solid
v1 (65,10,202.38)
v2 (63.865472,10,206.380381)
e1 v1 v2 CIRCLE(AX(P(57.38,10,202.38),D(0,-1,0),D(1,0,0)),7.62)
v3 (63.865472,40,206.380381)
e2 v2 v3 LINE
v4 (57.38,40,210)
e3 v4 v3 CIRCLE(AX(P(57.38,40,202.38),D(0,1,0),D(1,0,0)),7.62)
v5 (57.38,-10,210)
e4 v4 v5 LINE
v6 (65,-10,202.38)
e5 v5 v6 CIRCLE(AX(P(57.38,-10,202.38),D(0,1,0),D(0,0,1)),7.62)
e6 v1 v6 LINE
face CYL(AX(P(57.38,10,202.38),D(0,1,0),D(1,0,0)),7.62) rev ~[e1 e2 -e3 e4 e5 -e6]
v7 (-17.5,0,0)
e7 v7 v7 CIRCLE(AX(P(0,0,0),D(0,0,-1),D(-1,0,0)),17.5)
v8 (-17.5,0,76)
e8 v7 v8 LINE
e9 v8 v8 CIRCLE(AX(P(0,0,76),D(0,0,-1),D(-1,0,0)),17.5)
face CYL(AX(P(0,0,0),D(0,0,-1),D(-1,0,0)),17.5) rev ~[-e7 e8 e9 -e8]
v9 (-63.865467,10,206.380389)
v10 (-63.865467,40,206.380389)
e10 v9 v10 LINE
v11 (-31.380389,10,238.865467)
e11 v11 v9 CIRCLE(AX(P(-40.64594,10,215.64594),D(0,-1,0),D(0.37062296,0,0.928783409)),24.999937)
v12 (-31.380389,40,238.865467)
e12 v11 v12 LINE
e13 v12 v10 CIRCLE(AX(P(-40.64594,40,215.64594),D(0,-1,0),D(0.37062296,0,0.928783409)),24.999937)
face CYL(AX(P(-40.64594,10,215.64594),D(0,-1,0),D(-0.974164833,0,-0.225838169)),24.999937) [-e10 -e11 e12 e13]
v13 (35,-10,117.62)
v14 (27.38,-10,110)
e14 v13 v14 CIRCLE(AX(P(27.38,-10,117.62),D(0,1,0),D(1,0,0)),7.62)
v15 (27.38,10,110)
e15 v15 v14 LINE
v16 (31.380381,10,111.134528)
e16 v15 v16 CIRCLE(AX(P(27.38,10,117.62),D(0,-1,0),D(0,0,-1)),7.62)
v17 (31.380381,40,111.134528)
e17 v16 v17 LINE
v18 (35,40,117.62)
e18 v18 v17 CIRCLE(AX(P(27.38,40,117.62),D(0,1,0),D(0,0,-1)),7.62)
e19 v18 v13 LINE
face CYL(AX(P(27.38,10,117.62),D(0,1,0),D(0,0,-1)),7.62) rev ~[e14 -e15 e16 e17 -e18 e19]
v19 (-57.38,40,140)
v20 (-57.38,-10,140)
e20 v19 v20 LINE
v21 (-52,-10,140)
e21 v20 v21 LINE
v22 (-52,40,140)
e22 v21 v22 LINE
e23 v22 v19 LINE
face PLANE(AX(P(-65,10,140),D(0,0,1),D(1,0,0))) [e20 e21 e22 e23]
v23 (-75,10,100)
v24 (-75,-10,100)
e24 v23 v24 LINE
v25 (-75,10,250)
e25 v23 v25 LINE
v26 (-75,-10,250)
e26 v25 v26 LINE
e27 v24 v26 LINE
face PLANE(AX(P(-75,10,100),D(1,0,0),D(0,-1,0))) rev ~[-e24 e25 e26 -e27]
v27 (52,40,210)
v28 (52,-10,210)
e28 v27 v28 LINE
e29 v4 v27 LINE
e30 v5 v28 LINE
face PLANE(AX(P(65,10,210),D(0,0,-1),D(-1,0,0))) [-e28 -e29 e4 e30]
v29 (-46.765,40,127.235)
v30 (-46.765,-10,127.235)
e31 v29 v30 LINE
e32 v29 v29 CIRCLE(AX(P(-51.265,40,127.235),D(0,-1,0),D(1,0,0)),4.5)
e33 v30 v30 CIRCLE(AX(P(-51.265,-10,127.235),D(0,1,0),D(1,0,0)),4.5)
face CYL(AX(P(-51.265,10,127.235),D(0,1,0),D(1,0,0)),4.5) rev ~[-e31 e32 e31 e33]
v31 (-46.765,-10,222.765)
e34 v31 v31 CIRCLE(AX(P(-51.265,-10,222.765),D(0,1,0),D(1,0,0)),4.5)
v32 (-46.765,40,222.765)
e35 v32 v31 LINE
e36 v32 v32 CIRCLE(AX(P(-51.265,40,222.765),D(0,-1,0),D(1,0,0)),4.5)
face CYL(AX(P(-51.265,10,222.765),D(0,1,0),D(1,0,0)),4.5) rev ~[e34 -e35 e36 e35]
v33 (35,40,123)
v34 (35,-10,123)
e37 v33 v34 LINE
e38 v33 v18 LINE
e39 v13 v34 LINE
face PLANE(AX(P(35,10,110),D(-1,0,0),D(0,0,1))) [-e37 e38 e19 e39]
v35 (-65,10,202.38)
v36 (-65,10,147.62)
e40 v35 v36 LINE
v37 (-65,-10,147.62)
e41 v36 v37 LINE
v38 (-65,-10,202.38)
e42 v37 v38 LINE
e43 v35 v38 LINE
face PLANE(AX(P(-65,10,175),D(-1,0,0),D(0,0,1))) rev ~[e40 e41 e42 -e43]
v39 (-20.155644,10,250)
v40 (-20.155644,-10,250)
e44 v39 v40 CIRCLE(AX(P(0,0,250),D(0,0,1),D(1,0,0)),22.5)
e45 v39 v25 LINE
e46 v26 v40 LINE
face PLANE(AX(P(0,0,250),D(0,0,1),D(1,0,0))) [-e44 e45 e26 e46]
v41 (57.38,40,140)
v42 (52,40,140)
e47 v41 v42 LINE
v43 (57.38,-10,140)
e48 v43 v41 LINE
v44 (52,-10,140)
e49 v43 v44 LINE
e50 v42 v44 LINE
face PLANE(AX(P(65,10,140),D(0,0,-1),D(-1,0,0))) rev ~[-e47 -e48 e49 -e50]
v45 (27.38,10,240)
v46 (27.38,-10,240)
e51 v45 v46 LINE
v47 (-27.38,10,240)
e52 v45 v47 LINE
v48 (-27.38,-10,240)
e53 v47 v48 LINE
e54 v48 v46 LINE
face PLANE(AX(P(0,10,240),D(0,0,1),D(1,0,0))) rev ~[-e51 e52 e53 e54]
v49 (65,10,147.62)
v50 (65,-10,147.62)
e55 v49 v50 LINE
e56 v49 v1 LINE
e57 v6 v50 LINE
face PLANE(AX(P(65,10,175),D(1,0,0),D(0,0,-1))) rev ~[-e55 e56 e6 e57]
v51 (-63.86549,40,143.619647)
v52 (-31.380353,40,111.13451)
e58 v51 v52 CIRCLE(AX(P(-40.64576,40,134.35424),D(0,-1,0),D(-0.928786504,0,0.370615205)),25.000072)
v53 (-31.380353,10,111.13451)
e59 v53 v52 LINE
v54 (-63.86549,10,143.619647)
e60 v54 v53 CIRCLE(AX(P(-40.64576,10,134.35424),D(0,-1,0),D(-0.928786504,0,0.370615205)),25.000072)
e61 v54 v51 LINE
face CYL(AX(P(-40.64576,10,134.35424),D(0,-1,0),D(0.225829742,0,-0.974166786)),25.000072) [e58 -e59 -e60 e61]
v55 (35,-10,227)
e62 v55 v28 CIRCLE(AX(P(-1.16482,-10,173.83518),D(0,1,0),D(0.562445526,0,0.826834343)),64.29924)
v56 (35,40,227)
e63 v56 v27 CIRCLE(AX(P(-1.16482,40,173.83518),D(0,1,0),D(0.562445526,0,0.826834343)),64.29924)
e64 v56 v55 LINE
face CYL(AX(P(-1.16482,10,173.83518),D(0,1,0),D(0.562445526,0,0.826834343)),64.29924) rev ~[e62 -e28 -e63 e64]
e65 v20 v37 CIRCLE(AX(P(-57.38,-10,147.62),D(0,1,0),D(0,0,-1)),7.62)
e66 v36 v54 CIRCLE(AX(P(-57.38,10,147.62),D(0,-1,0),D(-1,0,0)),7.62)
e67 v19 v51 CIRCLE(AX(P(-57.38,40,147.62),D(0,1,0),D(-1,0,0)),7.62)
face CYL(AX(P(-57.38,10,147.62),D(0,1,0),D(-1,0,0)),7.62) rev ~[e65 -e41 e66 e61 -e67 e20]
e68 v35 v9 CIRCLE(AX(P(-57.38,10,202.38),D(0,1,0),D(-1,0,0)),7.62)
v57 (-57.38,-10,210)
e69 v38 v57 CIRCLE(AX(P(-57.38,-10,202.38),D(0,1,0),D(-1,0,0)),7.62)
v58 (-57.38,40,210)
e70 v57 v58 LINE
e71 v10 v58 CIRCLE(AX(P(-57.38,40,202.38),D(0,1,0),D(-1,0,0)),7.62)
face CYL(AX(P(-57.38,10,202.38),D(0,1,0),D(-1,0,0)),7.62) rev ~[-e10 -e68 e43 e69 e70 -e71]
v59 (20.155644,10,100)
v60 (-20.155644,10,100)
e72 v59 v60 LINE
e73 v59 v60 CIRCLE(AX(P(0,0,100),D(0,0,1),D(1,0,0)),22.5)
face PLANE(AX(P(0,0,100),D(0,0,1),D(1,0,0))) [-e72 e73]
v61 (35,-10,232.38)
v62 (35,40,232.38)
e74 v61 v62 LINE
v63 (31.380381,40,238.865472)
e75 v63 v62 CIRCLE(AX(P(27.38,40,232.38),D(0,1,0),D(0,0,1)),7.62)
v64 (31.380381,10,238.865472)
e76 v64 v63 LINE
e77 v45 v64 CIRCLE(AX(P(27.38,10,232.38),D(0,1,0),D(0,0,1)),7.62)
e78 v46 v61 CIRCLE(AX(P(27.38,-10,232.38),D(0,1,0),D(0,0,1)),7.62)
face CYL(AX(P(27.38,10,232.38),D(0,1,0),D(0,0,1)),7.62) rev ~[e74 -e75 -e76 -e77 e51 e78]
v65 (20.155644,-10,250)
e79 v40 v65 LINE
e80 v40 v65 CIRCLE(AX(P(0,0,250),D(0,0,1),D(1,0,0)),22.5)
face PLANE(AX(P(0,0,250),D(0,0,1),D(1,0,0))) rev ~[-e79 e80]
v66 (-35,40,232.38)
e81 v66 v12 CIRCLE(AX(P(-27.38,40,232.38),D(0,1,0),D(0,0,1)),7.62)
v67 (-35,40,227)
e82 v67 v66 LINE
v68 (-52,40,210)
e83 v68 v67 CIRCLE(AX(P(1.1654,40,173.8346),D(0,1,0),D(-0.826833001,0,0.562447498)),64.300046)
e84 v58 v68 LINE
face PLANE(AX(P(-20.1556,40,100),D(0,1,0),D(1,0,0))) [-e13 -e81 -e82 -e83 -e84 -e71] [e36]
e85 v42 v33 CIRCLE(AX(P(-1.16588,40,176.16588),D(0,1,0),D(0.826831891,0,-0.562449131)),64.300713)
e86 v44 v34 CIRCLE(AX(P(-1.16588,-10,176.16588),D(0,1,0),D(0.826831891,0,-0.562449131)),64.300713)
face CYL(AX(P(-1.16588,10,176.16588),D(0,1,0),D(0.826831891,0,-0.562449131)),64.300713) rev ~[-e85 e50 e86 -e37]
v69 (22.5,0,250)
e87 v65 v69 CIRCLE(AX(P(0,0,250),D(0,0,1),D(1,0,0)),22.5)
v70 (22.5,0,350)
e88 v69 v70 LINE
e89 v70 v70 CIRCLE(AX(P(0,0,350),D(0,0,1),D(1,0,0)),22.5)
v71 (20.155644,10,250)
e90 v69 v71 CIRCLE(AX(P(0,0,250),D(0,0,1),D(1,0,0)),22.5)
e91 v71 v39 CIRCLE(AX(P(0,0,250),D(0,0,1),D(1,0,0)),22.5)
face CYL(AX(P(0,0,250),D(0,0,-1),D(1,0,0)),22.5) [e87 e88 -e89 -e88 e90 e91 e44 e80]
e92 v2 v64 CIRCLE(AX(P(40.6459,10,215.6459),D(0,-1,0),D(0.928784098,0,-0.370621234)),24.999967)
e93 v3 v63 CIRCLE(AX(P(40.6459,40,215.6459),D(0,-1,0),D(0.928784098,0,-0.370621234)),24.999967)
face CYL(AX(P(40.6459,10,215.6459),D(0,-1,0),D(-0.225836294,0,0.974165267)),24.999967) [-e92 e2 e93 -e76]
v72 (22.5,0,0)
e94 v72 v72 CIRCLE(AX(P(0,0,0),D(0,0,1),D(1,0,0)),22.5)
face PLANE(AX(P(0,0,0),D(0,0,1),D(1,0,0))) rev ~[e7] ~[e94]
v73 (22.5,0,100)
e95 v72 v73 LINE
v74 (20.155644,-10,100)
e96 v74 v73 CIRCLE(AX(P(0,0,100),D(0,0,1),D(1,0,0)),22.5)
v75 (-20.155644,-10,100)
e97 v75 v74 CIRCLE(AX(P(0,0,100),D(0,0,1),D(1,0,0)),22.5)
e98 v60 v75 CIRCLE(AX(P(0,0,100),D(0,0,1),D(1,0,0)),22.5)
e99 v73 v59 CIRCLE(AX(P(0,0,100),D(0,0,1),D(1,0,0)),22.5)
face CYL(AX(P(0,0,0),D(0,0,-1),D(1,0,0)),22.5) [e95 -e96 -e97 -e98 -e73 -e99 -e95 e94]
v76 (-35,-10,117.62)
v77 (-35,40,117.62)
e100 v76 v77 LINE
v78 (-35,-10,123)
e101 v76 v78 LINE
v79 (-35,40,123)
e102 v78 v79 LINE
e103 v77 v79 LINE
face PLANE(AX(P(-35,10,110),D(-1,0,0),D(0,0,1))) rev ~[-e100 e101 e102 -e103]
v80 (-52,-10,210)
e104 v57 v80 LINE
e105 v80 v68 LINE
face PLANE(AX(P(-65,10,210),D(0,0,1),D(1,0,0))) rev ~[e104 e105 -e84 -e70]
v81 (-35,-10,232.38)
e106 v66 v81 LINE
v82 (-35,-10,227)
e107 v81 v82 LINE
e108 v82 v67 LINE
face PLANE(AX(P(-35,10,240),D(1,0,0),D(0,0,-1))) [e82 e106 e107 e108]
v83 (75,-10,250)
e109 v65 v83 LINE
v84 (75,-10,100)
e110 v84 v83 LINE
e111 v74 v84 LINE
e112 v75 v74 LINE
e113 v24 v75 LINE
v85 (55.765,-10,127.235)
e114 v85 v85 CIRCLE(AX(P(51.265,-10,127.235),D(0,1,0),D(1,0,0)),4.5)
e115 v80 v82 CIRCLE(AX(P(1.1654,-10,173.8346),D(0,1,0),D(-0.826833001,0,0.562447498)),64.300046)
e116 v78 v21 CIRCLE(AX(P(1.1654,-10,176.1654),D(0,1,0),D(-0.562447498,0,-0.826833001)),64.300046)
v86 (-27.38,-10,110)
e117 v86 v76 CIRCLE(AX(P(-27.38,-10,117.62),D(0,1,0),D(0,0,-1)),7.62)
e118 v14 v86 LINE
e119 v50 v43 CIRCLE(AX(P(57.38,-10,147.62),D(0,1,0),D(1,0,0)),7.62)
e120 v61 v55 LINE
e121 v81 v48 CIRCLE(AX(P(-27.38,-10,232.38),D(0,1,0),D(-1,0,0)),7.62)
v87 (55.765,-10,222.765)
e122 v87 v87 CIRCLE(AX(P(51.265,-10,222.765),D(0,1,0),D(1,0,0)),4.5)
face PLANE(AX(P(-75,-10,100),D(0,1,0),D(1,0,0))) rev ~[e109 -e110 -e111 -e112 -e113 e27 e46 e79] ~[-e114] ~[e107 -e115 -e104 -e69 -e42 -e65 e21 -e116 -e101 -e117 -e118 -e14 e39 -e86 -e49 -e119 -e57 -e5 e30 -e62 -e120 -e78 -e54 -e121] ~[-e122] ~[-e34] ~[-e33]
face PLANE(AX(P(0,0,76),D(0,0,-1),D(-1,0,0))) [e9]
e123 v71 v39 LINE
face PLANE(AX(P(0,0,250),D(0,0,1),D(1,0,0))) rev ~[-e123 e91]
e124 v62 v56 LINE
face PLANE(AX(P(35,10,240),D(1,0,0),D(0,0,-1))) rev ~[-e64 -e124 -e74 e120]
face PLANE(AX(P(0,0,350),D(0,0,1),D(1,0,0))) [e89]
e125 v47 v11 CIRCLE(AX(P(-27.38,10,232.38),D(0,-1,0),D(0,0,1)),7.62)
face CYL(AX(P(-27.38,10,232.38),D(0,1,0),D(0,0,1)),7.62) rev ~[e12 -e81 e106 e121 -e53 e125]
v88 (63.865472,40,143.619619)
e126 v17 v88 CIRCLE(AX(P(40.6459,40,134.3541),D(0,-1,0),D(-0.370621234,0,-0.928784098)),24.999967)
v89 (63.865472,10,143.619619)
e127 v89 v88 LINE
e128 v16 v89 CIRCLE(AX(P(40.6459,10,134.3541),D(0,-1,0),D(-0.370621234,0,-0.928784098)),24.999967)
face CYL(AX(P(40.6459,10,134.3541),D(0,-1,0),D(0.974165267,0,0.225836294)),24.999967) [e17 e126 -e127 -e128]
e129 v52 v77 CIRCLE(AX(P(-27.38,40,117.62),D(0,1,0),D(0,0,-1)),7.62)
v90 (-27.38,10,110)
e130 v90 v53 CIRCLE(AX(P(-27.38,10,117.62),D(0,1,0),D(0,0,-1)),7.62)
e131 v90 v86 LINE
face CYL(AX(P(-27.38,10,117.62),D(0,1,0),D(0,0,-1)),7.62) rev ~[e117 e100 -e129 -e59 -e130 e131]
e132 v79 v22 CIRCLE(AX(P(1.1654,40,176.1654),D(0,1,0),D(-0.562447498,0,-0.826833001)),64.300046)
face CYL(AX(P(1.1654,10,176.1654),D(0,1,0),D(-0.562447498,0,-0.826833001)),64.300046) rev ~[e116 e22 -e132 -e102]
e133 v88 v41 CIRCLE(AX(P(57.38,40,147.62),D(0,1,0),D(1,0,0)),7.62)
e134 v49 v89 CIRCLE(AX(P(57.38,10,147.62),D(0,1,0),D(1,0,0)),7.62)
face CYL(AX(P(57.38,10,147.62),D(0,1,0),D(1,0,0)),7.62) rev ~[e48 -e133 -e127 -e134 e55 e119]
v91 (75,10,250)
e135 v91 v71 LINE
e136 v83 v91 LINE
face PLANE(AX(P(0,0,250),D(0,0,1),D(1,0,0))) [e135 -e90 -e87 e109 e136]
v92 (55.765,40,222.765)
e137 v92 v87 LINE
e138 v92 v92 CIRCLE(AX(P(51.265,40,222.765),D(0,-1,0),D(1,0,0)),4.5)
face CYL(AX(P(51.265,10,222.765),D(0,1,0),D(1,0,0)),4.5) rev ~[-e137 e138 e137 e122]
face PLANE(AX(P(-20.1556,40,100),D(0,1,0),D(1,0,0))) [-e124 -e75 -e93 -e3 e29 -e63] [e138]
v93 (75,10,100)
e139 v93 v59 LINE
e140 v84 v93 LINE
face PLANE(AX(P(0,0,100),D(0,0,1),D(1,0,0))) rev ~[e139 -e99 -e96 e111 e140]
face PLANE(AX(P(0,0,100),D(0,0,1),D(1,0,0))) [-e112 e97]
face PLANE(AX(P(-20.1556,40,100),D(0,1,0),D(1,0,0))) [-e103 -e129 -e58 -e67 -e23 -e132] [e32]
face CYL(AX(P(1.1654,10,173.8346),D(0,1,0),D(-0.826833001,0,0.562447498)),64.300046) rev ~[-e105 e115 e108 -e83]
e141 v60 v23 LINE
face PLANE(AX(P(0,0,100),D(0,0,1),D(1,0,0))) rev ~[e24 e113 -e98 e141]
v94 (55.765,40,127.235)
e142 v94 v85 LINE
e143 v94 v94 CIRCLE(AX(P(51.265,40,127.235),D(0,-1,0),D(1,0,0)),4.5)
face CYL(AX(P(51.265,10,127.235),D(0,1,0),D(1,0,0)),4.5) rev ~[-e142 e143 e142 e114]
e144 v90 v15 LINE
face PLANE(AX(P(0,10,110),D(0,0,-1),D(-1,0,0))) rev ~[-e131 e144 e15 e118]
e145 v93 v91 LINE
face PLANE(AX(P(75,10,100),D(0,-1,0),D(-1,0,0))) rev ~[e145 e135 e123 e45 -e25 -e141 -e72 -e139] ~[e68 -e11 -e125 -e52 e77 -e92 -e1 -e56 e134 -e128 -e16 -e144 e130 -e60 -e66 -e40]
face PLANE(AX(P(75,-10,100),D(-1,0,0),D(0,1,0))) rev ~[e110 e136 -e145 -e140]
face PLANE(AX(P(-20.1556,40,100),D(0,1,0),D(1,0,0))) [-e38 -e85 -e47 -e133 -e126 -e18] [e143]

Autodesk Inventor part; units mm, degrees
ref_plane "YZ Plane" through (0, 0, 0) normal (1, 0, 0) x (0, 1, 0)
ref_plane "XZ Plane" through (0, 0, 0) normal (0, 1, 0) x (-1, 0, 0)
ref_plane "XY Plane" through (0, 0, 0) normal (0, 0, 1) x (1, 0, 0)
sketch "Sketch1" plane through (0, 0, 0) normal (0, 0, 1) x (1, 0, 0)
  circle A0 centre (0, 0) radius 22.5
  dimension "d0" = 45
extrude "Extrusion1" add sketch "Sketch1" along normal blind 100
sketch "Sketch2" plane through (0, 0, 0) normal (0, 0, -1) x (-1, 0, 0)
  circle A0 centre (0, 0) radius 17.5
  point P0 (-6.0869, 16.4073)
  point P1 (4.042, 17.0268)
  point P2 (5, 16.7705)
  point P3 (-5, 16.7705)
  dimension "d3" = 35
sketch "Sketch5" plane through (0, 0, 100) normal (0, 0, 1) x (1, 0, 0)
  line L0 (-75, -10) -> (75, -10)
  line L1 (75, -10) -> (75, 10)
  line L2 (75, 10) -> (-75, 10)
  line L3 (-75, 10) -> (-75, -10)
  line L4 (-75, -10) -> (75, 10) construction
  line L5 (75, -10) -> (-75, 10) construction
  point P0 (0, 0)
  dimension "d32" = 150
  dimension "d33" = 20
extrude "Extrusion5" add sketch "Sketch5" along normal blind 150
sketch "Sketch8" plane through (0, 0, 250) normal (0, 0, 1) x (1, 0, 0)
  circle A0 centre (0, 0) radius 22.5
  dimension "d136" = 45
extrude "Extrusion8" add sketch "Sketch8" along normal blind 100
sketch "Sketch11" plane through (-20.1556, 10, 100) normal (0, 1, 0) x (1, 0, 0)
  line L0 (-44.8444, -140) -> (85.1556, -140)
  line L1 (85.1556, -140) -> (85.1556, -10)
  line L2 (85.1556, -10) -> (-44.8444, -10)
  line L3 (-44.8444, -10) -> (-44.8444, -140)
  line L4 (-44.8444, -140) -> (85.1556, -10) construction
  line L5 (85.1556, -140) -> (-44.8444, -10) construction
  line L6 (-54.8444, 0) -> (-54.8444, -150) projected
  line L7 (0, -150) -> (40.3113, -150) projected
  line L8 (-54.8444, -127.249) -> (-44.8444, -127.249)
  line L9 (-54.8444, -150) -> (0, -150) projected
  line L10 (-32.0934, -150) -> (-32.0934, -140)
  line L11 (-54.8444, 0) -> (-54.8444, -150) projected
  line L12 (-54.8444, -22.751) -> (-44.8444, -22.751)
  line L13 (-32.0934, 0) -> (-32.0934, -10)
  line L14 (0, 0) -> (40.3113, 0) projected
  line L15 (72.4046, 0) -> (72.4046, -10)
  line L16 (95.1556, -22.751) -> (85.1556, -22.751)
  line L17 (40.3113, -150) -> (95.1556, -150) projected
  line L18 (72.4046, -150) -> (72.4046, -140)
  line L19 (95.1556, 0) -> (95.1556, -150) projected
  line L20 (95.1556, -127.249) -> (85.1556, -127.249)
  line L21 (-44.8444, -75) -> (-44.8444, -40)
  line L22 (-44.8444, -75) -> (-44.8444, -110)
  line L23 (-44.8444, -40) -> (-31.8444, -40)
  line L24 (20.1556, -10) -> (-14.8444, -10)
  line L25 (20.1556, -10) -> (55.1556, -10)
  line L26 (-14.8444, -10) -> (-14.8444, -23)
  arc A0 (-14.8444, -23) -> (-31.8444, -40) centre (21.321, -76.1654) ccw
  line L27 (20.1556, -140) -> (-14.8444, -140)
  line L28 (20.1556, -140) -> (55.1556, -140)
  line L29 (85.1556, -75) -> (85.1556, -110)
  line L30 (85.1556, -75) -> (85.1556, -40)
  line L31 (20.1556, -10) -> (55.1556, -10)
  line L32 (-44.8444, -110) -> (-31.8444, -110)
  line L33 (-14.8444, -140) -> (-14.8444, -127)
  line L34 (55.1556, -140) -> (55.1556, -127)
  line L35 (85.1556, -110) -> (72.1556, -110)
  line L36 (85.1556, -40) -> (72.1556, -40)
  line L37 (55.1556, -10) -> (55.1556, -23)
  arc A1 (55.1556, -127) -> (72.1556, -110) centre (18.9903, -73.8346) ccw
  arc A2 (-31.8444, -110) -> (-14.8444, -127) centre (21.321, -73.8346) ccw
  arc A3 (72.1556, -40) -> (55.1556, -23) centre (18.9903, -76.1654) ccw
  point P0 (20.1556, 100)
  point P1 (20.1556, -75)
  dimension "d72" = 130
  dimension "d73" = 130
  dimension "d74" = 75
  dimension "d75" = 75
  dimension "d84" = 35
  dimension "d85" = 35
  dimension "d86" = 13
  dimension "d87" = 35
  dimension "d88" = 35
  dimension "d89" = 13
  dimension "d90" = 64.3
  dimension "d96" = 35
  dimension "d97" = 35
  dimension "d98" = 35
  dimension "d99" = 35
  dimension "d100" = 13
  dimension "d101" = 13
  dimension "d102" = 13
  dimension "d103" = 13
  dimension "d104" = 13
  dimension "d105" = 13
  dimension "d106" = 64.3
  dimension "d107" = 64.3
  dimension "d108" = 64.3
extrude "Extrusion10" cut sketch "Sketch11" against normal blind 20 contours L33 A2 L32 L3 L23 A0 L26 L2 L37 A3 L36 L1 L35 A1 L34 L0
sketch "Sketch12" plane through (-20.1556, 10, 100) normal (0, 1, 0) x (1, 0, 0)
  circle A0 centre (-31.1094, -27.235) radius 4.5
  line L0 (-44.8444, -40) -> (-31.8444, -40) projected
  line L1 (-44.8444, -110) -> (-44.8444, -40) projected
  circle A1 centre (-31.1094, -122.765) radius 4.5
  circle A2 centre (71.4206, -122.765) radius 4.5
  circle A3 centre (71.4206, -27.235) radius 4.5
  line L2 (-31.8444, -110) -> (-44.8444, -110) projected
  line L3 (85.1556, -110) -> (72.1556, -110) projected
  line L4 (85.1556, -40) -> (85.1556, -110) projected
  line L5 (72.1556, -40) -> (85.1556, -40) projected
  point P0 (20.1556, 100)
  point P1 (-28.3394, -127.249)
  dimension "d91" = 9
  dimension "d92" = 12.765
  dimension "d93" = 13.735
  dimension "d109" = 9
  dimension "d110" = 9
  dimension "d111" = 9
  dimension "d112" = 12.765
  dimension "d113" = 13.735
  dimension "d114" = 12.765
  dimension "d115" = 13.735
  dimension "d116" = 13.735
  dimension "d117" = 12.765
extrude "Extrusion11" cut sketch "Sketch12" along normal mid plane 50
sketch "Sketch13" plane through (-20.1556, 10, 100) normal (0, 1, 0) x (1, 0, 0)
  line L0 (-44.8444, -110) -> (-44.8444, -40) projected
  line L1 (55.1556, -140) -> (-14.8444, -140) projected
  arc A0 (-44.8444, -110) -> (-14.8444, -140) centre (-20.4902, -115.6459) ccw
  line L2 (-14.8444, -10) -> (-14.8444, -23) projected
  arc A1 (-14.8444, -10) -> (-44.8444, -40) centre (-20.4902, -34.3541) ccw
  line L3 (85.1556, -110) -> (85.1556, -40) projected
  arc A2 (55.1556, -140) -> (85.1556, -110) centre (60.8015, -115.6459) ccw
  line L4 (85.1556, -40) -> (72.1556, -40) projected
  line L5 (55.1556, -23) -> (55.1556, -10) projected
  arc A3 (85.1556, -40) -> (55.1556, -10) centre (60.8015, -34.3541) ccw
  line L6 (-14.8444, -127) -> (-14.8444, -140) projected
  line L7 (-14.8444, -140) -> (-14.8444, -127)
  arc A4 (-31.8444, -110) -> (-14.8444, -127) centre (21.321, -73.8346) ccw projected
  line L8 (-44.8444, -110) -> (-31.8444, -110)
  arc A5 (-31.8444, -110) -> (-14.8444, -127) centre (21.321, -73.8346) ccw
  line L9 (-31.8444, -40) -> (-44.8444, -40) projected
  line L10 (-44.8444, -40) -> (-31.8444, -40)
  line L11 (-14.8444, -10) -> (-14.8444, -23)
  line L12 (55.1556, -10) -> (55.1556, -23)
  line L13 (72.1556, -40) -> (85.1556, -40)
  line L14 (85.1556, -110) -> (72.1556, -110) projected
  line L15 (72.1556, -110) -> (85.1556, -110)
  arc A6 (-14.8444, -23) -> (-31.8444, -40) centre (21.321, -76.1654) ccw projected
  arc A7 (-14.8444, -23) -> (-31.8444, -40) centre (21.321, -76.1654) ccw
  arc A8 (72.1556, -40) -> (55.1556, -23) centre (18.9903, -76.1654) ccw
  line L16 (55.1556, -140) -> (55.1556, -127) projected
  line L17 (55.1556, -140) -> (55.1556, -127)
  arc A9 (55.1556, -127) -> (72.1556, -110) centre (18.9903, -73.8346) ccw projected
  arc A10 (55.1556, -127) -> (72.1556, -110) centre (18.9903, -73.8346) ccw
  point P0 (20.1556, 100)
  dimension "d118" = 25
  dimension "d119" = 25
  dimension "d120" = 25
  dimension "d121" = 25
  dimension "d122" = 64.3
  dimension "d125" = 64.3
  dimension "d126" = 64.3
  dimension "d127" = 64.3
extrude "Extrusion12" add sketch "Sketch13" along normal blind 30
sketch "Sketch14" plane through (-20.1556, -10, 100) normal (0, -1, 0) x (1, 0, 0)
  circle A0 centre (-31.1094, 27.235) radius 4.5 projected
  circle A1 centre (-31.1094, 27.235) radius 4.5
  circle A2 centre (-31.1094, 122.765) radius 4.5 projected
  circle A3 centre (-31.1094, 122.765) radius 4.5
  circle A4 centre (71.4206, 122.765) radius 4.5 projected
  circle A5 centre (71.4206, 122.765) radius 4.5
  circle A6 centre (71.4206, 27.235) radius 4.5 projected
  circle A7 centre (71.4206, 27.235) radius 4.5
  point P0 (20.1556, -100)
  dimension "d130" = 9
  dimension "d131" = 9
  dimension "d132" = 9
  dimension "d133" = 9
extrude "Extrusion13" cut sketch "Sketch14" against normal blind 100
extrude "Extrusion14" cut sketch "Sketch2" against normal blind 76
fillet "Fillet7" radius 7.62 8 edges at (65, 0, 210) (65, 0, 140) (35, 0, 110) (35, 0, 240) (-35, 0, 240) (-65, 0, 210) (-65, 0, 140) (-35, 0, 110)
equation "\"d84\" = d98"
equation "\"d85\" = d98"
equation "\"d86\" = d104"
equation "\"d87\" = d98"
equation "\"d88\" = d98"
equation "\"d89\" = d104"
equation "\"d96\" = d98"
equation "\"d97\" = d98"
equation "\"d99\" = d98"
equation "\"d100\" = d104"
equation "\"d101\" = d104"
equation "\"d102\" = d105"
equation "\"d103\" = d104"
equation "\"d112\" = d92"
equation "\"d113\" = d93"
equation "\"d114\" = d112"
equation "\"d115\" = d113"
equation "\"d116\" = d115"
equation "\"d117\" = d114"
properties part number "FrontPlateV2"
